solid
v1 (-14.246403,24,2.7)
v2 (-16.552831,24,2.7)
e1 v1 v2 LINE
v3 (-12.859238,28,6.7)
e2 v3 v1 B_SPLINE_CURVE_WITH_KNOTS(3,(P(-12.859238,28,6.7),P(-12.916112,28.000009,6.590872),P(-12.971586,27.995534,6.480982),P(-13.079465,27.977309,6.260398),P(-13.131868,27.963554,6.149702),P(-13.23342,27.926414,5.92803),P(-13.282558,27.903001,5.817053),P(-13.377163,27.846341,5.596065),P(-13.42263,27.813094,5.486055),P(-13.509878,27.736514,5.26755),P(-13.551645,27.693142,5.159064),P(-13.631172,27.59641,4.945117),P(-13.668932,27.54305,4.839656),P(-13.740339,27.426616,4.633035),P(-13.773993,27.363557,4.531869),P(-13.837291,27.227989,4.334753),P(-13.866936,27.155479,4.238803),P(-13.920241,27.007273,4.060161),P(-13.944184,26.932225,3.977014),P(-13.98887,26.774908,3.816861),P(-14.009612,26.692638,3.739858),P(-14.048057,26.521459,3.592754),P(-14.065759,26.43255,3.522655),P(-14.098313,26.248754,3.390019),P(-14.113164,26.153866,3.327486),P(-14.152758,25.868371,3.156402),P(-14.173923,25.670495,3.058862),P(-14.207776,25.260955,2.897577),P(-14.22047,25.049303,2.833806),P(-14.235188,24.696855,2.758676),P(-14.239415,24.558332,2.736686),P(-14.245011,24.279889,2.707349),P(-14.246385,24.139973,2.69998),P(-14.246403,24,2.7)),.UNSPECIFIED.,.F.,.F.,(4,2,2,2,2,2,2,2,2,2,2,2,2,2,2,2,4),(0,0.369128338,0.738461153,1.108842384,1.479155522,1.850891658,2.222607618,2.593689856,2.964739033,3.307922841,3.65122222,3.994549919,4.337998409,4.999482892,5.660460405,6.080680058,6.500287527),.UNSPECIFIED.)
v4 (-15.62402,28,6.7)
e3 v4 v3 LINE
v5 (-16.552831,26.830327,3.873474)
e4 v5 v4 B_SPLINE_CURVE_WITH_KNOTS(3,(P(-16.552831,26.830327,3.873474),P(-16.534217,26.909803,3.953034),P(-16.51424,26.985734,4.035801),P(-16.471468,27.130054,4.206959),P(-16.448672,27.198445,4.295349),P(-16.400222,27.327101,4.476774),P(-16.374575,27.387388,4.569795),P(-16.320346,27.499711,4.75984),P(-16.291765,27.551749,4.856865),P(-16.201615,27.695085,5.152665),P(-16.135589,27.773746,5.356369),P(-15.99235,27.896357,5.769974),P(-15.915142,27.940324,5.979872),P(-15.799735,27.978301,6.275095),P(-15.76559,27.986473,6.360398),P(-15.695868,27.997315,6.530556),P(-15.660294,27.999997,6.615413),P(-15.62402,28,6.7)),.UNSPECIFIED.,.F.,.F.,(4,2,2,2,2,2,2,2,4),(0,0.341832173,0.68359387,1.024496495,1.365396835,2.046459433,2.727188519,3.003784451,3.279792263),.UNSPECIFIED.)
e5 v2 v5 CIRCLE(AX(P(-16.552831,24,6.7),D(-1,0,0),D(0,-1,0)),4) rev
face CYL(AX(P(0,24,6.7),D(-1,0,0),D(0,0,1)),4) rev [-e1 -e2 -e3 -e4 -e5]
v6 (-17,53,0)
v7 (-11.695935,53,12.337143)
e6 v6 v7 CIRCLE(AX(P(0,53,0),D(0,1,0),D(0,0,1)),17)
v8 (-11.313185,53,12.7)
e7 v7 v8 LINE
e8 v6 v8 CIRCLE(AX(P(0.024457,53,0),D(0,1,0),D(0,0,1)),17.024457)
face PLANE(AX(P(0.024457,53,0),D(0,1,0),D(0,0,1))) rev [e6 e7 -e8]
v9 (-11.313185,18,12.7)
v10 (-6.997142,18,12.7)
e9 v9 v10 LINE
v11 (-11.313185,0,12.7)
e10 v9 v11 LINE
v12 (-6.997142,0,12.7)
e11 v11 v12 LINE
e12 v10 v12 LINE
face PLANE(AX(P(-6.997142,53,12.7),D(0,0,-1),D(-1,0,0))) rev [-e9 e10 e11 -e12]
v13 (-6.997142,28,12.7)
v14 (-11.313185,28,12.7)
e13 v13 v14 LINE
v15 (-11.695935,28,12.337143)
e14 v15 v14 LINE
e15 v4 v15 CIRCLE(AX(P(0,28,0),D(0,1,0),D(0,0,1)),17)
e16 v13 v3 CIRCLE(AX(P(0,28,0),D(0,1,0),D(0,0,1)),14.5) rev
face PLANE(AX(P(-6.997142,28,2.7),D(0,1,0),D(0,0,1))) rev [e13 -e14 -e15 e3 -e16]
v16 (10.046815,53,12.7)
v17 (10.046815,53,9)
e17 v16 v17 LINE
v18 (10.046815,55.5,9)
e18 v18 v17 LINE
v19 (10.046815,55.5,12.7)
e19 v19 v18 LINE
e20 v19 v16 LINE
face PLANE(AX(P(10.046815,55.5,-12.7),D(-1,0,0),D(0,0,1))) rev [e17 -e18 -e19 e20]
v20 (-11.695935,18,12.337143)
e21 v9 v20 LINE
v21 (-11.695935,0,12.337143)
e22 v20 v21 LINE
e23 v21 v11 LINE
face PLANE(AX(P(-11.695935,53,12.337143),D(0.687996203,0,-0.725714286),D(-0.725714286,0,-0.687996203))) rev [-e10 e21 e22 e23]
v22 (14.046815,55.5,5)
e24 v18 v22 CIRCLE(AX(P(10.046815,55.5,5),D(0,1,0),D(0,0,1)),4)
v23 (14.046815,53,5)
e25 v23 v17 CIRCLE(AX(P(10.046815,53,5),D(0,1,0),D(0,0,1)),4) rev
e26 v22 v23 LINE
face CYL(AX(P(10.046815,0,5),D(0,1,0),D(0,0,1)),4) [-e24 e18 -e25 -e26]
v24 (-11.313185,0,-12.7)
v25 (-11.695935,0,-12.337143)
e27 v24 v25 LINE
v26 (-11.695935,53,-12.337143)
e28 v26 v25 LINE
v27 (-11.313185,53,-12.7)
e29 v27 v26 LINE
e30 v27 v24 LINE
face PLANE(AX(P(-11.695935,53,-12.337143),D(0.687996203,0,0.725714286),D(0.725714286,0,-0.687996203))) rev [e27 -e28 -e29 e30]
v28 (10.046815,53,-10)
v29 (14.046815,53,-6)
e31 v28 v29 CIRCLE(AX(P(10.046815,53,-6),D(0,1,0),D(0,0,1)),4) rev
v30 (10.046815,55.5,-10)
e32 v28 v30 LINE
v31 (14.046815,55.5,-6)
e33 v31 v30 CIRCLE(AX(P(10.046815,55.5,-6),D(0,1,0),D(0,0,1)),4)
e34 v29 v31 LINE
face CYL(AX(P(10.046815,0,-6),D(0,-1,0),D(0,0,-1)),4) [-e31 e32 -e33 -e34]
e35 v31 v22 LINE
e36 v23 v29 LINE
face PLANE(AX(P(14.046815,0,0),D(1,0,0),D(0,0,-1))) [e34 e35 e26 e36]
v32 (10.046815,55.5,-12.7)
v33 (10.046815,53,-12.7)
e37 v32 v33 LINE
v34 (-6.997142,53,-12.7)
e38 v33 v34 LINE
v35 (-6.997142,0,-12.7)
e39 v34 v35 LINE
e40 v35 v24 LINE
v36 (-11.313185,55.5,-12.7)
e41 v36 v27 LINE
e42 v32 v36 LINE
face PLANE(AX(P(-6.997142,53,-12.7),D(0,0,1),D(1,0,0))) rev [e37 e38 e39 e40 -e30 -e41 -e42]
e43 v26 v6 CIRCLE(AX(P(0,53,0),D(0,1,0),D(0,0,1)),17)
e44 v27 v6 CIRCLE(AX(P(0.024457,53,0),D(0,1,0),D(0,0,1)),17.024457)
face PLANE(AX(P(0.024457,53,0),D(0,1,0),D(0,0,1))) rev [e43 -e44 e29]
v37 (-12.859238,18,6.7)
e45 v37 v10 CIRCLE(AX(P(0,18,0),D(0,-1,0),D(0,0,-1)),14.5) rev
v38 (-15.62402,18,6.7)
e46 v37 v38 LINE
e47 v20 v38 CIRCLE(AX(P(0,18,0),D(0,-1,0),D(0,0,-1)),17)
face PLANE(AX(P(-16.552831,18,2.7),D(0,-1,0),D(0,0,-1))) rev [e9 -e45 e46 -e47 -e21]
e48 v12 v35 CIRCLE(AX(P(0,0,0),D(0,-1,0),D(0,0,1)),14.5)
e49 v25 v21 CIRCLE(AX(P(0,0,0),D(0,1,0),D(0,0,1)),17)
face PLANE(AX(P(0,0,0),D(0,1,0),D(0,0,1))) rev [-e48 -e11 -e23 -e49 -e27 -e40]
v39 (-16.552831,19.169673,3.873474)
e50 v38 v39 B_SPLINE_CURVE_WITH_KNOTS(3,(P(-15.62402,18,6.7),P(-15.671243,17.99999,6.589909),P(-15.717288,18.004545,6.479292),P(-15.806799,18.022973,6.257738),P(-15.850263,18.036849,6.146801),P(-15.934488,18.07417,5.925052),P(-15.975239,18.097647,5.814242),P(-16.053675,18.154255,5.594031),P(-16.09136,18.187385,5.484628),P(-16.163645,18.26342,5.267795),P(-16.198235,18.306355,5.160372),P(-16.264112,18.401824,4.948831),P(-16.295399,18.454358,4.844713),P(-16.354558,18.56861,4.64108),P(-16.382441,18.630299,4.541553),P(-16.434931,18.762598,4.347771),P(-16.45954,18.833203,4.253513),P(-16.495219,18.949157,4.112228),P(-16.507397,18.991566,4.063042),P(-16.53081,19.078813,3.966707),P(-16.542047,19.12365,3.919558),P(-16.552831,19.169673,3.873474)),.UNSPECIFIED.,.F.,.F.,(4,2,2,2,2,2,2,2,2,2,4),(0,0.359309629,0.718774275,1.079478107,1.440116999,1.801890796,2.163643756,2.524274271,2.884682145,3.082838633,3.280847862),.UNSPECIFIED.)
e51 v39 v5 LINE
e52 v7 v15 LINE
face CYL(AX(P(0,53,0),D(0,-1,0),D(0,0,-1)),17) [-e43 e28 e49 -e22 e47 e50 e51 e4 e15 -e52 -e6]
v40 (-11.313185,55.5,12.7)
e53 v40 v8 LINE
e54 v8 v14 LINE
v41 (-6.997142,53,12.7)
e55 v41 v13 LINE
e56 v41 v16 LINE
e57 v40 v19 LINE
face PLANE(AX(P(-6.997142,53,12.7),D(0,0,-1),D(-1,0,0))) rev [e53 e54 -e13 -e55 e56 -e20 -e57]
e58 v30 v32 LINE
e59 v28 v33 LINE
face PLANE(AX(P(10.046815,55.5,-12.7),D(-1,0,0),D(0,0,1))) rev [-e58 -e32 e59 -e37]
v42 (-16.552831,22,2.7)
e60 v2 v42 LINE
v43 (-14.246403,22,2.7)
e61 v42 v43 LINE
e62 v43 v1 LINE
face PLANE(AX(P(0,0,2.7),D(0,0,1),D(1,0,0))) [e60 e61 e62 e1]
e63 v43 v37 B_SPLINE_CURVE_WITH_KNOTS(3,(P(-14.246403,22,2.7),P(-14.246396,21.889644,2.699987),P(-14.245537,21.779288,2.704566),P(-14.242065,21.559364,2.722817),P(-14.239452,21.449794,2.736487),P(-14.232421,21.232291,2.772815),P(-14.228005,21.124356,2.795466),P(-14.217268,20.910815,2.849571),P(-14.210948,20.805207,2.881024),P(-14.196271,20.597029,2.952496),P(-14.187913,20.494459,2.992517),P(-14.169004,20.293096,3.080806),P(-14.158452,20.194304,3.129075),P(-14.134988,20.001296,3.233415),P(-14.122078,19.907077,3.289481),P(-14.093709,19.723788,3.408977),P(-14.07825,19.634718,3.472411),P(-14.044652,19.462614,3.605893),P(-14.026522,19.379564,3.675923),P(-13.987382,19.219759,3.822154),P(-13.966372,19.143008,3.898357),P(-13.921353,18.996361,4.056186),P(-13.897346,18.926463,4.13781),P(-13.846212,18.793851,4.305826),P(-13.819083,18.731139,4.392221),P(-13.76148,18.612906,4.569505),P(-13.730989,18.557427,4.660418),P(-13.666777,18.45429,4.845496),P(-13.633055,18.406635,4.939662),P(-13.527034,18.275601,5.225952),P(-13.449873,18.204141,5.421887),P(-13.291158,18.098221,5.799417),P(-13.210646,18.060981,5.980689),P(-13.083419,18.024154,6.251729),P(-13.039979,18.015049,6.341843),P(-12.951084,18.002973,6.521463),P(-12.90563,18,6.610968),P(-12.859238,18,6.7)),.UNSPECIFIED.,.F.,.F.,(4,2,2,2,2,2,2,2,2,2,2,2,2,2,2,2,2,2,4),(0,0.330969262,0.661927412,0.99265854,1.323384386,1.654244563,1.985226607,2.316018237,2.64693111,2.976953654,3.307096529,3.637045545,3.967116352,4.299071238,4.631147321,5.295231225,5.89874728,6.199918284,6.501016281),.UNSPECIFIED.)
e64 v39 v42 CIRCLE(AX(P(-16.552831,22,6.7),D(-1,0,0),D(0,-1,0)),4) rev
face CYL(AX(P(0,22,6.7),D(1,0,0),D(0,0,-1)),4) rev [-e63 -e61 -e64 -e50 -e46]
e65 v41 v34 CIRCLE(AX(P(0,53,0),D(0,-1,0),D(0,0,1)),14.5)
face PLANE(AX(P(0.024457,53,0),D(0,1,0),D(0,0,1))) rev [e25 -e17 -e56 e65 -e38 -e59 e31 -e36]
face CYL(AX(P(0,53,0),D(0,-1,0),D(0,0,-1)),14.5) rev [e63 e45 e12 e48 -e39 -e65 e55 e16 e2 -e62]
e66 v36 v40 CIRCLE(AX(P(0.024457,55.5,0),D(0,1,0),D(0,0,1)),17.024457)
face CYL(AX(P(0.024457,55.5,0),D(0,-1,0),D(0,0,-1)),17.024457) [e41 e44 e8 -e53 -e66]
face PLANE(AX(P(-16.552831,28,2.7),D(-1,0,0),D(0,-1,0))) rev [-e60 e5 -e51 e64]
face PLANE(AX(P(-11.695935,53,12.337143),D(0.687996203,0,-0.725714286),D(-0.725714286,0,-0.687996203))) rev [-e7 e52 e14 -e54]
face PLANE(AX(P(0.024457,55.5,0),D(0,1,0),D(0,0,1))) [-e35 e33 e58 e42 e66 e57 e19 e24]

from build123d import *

# Parameters (mm, degrees)
BOSS_EXTRUDE1_DEPTH = 53
BOSS_EXTRUDE2_DEPTH = 2.5
SKETCH3_W           = 19
SKETCH3_H           = 2.5
BOSS_EXTRUDE3_DEPTH = 4
SKETCH4_W           = 9.555688256
SKETCH4_H           = 10
CUT_EXTRUDE1_DEPTH  = 10
FILLET2_R           = 4
FILLET3_R           = 4


with BuildPart() as part:
    # Sketch1 → Boss-Extrude1 (new body)
    with BuildSketch(Plane(origin=(0, 0, 0), x_dir=(1, 0, 0), z_dir=(0, 1, 0))):
        with BuildLine():
            Line((-6.997142274, 12.7), (-11.313185358, 12.7))
            Line((-11.313185358, 12.7), (-11.695935453, 12.337142857))
            ThreePointArc((-11.695935453, 12.337142857), (-17, 0), (-11.695935453, -12.337142857))
            Line((-11.695935453, -12.337142857), (-11.313185358, -12.7))
            Line((-11.313185358, -12.7), (-6.997142274, -12.7))
            ThreePointArc((-6.997142274, -12.7), (-14.5, 0), (-6.997142274, 12.7))
        make_face()
    extrude(amount=BOSS_EXTRUDE1_DEPTH)

    # Sketch2 → Boss-Extrude2 (add)
    with BuildSketch(Plane(origin=(0, 53, 0), x_dir=(1, 0, 0), z_dir=(0, 1, 0))):
        with BuildLine():
            Line((10.046814642, 12.7), (10.046814642, -12.7))
            Line((10.046814642, -12.7), (-11.313185358, -12.7))
            ThreePointArc((-11.313185358, -12.7), (-17, 0), (-11.313185358, 12.7))
            Line((-11.313185358, 12.7), (10.046814642, 12.7))
        make_face()
    extrude(amount=BOSS_EXTRUDE2_DEPTH)

    # Sketch3 → Boss-Extrude3 (add)
    with BuildSketch(Plane(origin=(10.046814642, 0, 0), x_dir=(0, 0, -1), z_dir=(1, 0, 0))):
        with Locations((0.5, 54.25)):
            Rectangle(SKETCH3_W, SKETCH3_H)
    extrude(amount=BOSS_EXTRUDE3_DEPTH)

    # Sketch4 → Cut-Extrude1 (cut)
    with BuildSketch(Plane.XY.offset(12.7)):
        with Locations((-11.774986402, 23)):
            Rectangle(SKETCH4_W, SKETCH4_H)
    extrude(amount=-CUT_EXTRUDE1_DEPTH, mode=Mode.SUBTRACT)

    # Fillet2
    fillet2_edges = [part.edges().sort_by_distance(p)[0] for p in [
        (14.046814642, 54.25, -10),
        (14.046814642, 54.25, 9),
    ]]
    fillet(fillet2_edges, radius=FILLET2_R - 0.0001)  # a hair under: the kernel refuses the full size

    # Fillet3
    fillet3_edges = [part.edges().sort_by_distance(p)[0] for p in [
        (-15.399616792, 18, 2.7),
        (-15.399616792, 28, 2.7),
    ]]
    fillet(fillet3_edges, radius=FILLET3_R)


solid = part.part
